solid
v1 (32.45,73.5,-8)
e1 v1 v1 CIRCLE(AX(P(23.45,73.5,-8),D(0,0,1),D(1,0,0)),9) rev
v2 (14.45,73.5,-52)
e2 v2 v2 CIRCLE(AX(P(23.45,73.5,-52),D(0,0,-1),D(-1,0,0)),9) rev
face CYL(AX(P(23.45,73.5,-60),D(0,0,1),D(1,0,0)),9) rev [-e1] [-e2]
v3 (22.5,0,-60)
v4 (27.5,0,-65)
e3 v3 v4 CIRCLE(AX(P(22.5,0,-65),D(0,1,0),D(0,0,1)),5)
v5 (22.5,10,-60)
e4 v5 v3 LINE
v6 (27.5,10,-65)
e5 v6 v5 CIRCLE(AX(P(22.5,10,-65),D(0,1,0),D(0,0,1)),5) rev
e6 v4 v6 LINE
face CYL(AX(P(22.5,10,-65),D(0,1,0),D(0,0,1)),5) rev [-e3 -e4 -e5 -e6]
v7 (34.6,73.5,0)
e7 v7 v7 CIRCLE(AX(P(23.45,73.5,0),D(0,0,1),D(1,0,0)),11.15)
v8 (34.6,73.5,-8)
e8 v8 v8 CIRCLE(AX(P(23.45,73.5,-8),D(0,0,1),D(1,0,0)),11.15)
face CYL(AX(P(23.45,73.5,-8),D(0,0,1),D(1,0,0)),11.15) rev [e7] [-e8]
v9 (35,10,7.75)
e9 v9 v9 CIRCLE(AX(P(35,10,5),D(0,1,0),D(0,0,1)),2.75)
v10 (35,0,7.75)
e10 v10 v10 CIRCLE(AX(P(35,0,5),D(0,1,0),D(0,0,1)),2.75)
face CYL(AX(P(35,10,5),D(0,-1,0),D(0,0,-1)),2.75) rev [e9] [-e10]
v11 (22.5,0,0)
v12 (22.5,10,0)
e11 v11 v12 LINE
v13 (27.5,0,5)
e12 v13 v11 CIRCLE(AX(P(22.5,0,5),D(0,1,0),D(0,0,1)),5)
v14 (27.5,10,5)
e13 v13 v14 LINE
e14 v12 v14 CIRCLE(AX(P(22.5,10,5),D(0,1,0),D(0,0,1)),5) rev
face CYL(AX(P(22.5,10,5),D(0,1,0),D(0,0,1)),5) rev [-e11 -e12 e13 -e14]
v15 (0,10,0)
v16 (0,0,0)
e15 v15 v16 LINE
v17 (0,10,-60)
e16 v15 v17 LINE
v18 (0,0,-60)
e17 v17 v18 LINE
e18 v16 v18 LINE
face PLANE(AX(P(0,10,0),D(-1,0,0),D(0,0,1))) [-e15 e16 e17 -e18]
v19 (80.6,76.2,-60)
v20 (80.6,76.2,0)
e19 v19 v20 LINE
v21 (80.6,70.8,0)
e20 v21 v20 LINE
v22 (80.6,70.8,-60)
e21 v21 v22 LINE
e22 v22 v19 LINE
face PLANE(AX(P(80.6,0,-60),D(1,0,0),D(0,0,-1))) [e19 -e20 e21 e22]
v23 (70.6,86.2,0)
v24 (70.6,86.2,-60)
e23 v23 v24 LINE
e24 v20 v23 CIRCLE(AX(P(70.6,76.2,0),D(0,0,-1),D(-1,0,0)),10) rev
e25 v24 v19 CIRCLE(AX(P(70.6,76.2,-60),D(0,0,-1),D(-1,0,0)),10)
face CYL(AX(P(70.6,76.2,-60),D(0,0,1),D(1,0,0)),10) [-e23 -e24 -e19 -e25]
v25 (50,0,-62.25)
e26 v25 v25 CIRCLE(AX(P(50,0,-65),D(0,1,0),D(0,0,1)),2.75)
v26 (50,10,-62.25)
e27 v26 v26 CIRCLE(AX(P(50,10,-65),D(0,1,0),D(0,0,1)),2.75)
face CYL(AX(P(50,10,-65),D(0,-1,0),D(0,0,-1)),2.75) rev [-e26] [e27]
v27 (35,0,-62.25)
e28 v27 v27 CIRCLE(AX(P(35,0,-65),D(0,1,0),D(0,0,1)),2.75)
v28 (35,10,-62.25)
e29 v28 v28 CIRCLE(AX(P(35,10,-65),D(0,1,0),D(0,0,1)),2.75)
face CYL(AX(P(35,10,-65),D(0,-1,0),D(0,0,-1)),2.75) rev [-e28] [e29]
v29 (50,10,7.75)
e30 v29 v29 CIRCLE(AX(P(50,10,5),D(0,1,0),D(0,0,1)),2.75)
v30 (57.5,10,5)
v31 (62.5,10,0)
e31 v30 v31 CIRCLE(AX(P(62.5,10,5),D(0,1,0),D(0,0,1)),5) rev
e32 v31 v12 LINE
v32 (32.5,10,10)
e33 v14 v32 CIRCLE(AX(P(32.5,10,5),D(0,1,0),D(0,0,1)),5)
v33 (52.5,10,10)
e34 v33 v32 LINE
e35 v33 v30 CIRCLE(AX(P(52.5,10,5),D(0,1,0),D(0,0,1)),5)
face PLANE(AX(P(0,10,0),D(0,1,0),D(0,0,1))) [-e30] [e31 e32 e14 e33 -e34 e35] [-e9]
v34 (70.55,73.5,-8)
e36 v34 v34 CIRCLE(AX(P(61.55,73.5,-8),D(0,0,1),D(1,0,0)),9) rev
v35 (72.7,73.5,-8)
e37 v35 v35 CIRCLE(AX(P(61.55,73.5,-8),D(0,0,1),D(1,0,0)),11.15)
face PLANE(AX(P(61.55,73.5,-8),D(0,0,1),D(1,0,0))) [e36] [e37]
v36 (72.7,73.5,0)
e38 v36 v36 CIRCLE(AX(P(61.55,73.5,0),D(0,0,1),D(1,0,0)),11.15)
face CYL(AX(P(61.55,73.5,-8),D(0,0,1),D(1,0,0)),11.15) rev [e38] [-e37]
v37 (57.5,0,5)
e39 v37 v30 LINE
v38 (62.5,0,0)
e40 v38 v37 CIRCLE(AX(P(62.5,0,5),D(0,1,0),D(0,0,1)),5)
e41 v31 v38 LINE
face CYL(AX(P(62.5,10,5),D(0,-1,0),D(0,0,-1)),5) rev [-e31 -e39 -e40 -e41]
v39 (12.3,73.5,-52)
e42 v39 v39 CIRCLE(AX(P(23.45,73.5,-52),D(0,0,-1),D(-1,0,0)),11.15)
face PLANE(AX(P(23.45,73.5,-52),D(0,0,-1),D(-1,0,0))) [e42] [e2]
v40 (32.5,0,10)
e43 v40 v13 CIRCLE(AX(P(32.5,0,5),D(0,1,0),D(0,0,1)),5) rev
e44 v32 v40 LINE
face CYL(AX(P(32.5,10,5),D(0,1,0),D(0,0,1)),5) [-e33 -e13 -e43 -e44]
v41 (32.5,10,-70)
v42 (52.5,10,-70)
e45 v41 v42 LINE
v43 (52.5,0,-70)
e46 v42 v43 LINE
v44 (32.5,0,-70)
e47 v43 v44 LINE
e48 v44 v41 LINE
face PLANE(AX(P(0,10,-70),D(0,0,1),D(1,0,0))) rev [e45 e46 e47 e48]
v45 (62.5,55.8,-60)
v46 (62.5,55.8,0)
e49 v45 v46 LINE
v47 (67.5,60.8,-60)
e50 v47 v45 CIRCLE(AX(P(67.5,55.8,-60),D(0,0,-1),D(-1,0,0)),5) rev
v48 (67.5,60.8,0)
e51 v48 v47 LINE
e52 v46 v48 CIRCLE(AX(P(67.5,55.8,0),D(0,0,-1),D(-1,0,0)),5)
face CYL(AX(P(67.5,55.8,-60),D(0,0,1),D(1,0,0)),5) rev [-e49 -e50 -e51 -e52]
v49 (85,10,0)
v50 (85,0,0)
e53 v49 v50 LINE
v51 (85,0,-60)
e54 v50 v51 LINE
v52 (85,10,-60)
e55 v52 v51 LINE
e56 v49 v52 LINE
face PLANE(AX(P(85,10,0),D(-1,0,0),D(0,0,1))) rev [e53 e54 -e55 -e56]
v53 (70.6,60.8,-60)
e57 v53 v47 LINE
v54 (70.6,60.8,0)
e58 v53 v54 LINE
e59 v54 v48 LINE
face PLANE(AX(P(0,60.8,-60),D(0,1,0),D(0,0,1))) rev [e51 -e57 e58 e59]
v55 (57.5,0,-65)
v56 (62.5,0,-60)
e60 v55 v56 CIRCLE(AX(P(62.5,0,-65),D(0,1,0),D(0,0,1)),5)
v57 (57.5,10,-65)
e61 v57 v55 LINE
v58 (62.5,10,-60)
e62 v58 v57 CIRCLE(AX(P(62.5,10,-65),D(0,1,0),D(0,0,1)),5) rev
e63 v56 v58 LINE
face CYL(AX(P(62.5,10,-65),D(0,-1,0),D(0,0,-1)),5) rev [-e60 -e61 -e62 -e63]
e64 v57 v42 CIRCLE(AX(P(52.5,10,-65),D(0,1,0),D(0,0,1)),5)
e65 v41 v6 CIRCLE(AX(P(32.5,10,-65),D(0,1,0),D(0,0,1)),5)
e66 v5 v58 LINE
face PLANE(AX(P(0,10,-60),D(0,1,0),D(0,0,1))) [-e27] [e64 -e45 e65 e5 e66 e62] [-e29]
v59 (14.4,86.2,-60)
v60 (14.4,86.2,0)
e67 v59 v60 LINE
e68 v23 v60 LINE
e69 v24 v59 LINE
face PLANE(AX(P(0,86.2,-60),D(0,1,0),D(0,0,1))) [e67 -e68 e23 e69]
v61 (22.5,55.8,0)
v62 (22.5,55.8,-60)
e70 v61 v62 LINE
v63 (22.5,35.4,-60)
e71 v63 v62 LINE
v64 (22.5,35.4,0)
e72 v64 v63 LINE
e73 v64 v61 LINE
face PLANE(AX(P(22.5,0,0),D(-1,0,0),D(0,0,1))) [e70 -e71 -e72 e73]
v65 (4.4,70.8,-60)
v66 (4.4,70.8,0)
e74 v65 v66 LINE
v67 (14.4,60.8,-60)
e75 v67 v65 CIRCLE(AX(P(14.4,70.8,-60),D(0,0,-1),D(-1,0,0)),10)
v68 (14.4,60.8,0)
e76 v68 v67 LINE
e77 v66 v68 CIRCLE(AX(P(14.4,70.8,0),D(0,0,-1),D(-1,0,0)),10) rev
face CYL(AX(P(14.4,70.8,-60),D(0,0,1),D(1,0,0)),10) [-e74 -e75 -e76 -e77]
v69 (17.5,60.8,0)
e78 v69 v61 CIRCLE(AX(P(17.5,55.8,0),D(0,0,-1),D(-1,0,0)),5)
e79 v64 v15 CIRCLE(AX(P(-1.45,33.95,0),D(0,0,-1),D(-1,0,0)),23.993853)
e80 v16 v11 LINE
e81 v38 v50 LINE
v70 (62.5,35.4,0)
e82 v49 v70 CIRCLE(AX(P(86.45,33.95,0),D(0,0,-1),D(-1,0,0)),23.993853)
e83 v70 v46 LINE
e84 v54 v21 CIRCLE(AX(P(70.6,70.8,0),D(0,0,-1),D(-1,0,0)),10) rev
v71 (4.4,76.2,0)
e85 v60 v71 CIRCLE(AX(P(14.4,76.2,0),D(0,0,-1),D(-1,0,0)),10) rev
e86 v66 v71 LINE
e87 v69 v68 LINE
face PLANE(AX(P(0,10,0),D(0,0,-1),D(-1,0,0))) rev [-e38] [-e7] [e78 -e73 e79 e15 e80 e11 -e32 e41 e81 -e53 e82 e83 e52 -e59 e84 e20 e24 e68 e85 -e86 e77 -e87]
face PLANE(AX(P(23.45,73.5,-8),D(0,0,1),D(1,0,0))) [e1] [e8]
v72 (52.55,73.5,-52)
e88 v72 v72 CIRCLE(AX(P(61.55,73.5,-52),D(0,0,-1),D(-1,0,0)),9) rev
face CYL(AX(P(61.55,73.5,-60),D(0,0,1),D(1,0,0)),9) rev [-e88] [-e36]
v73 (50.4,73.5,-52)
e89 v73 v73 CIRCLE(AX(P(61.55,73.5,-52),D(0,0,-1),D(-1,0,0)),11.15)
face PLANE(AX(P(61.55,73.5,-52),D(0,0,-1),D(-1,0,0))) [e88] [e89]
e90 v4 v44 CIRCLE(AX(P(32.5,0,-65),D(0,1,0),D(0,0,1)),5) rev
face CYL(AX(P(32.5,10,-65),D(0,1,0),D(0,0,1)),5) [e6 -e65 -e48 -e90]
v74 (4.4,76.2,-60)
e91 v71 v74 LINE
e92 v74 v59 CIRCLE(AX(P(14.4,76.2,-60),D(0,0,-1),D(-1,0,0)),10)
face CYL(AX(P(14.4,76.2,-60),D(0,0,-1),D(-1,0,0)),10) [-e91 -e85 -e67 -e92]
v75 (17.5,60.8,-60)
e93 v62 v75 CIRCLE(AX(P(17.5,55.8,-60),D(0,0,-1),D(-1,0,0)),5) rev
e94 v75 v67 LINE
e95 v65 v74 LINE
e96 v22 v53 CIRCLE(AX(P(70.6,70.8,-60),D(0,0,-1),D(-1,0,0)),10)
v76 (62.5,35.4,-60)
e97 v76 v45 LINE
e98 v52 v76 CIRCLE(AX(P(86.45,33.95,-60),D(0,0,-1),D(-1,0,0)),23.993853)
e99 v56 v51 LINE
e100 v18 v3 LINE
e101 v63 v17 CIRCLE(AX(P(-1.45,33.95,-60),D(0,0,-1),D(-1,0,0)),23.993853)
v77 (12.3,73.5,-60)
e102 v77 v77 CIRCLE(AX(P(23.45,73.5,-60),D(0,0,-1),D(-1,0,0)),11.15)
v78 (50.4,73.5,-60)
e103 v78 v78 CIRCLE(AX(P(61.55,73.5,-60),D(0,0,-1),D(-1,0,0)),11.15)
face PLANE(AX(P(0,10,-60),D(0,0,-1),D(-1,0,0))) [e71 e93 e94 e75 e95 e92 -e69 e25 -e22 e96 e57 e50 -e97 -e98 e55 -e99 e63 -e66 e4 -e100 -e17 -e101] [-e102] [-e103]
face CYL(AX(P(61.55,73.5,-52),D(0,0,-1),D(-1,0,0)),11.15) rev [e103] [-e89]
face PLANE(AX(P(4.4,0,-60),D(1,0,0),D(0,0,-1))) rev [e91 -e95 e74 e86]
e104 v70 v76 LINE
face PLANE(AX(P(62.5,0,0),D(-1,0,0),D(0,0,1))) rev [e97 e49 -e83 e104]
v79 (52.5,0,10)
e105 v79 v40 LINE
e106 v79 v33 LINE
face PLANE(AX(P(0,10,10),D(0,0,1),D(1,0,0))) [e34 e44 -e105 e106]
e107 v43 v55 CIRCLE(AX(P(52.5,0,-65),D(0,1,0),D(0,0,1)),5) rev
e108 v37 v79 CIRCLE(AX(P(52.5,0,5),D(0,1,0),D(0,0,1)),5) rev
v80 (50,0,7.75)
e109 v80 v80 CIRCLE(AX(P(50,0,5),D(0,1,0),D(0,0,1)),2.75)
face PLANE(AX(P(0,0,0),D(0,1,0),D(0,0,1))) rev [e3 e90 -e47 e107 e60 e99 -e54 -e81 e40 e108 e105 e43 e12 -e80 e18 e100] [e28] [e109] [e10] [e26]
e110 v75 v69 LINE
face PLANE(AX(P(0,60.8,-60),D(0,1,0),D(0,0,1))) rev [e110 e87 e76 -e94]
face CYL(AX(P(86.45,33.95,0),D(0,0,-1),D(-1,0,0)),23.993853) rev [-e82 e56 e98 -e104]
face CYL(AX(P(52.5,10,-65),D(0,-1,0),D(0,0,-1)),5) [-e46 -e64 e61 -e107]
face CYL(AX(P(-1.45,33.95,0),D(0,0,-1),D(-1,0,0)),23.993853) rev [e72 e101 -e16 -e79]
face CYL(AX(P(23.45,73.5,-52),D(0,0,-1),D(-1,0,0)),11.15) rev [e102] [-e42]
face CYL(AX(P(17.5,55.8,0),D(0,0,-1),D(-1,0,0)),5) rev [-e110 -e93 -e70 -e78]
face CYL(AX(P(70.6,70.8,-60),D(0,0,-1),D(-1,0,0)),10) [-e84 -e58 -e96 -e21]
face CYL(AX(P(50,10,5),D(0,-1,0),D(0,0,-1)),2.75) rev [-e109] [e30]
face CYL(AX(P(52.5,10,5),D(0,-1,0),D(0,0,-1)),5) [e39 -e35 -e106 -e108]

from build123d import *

# Parameters (mm, degrees)
SKETCH1_W           = 15
SKETCH1_H           = 10
SKETCH1_R           = 2.75
SKETCH1_W_2         = 85
SKETCH1_H_2         = 60
BOSS_EXTRUDE1_DEPTH = 10
BOSS_EXTRUDE2_DEPTH = 70
CUT_EXTRUDE1_DEPTH  = 10
FILLET1_START       = -1
FILLET1_DEPTH       = 11
FILLET1_2_DEPTH     = 10
SKETCH5_R           = 9
BOSS_EXTRUDE3_DEPTH = 60
SKETCH6_R           = 11.15
CUT_EXTRUDE2_DEPTH  = 8
CUT_EXTRUDE3_START  = -8
SKETCH7_R           = 11.15
CUT_EXTRUDE3_DEPTH  = 8
FILLET2_R           = 10
FILLET3_R           = 5


with BuildPart() as part:
    # Sketch1 → Boss-Extrude1 (new body)
    # profile 1 of 5: a face of its own
    with BuildSketch(Plane(origin=(0, 0, 0), x_dir=(1, 0, 0), z_dir=(0, 1, 0))):
        with Locations((35, 65)):
            Rectangle(SKETCH1_W, SKETCH1_H)
        with Locations(Location((35, 65, 0), (0, 0, 270))):
            Circle(SKETCH1_R, mode=Mode.SUBTRACT)
    # profile 2 of 5: a face of its own
    with BuildSketch(Plane(origin=(0, 0, 0), x_dir=(1, 0, 0), z_dir=(0, 1, 0))):
        with Locations((50, 65)):
            Rectangle(SKETCH1_W, SKETCH1_H)
        with Locations(Location((50, 65, 0), (0, 0, 270))):
            Circle(SKETCH1_R, mode=Mode.SUBTRACT)
    # profile 3 of 5: a face of its own
    with BuildSketch(Plane(origin=(0, 0, 0), x_dir=(1, 0, 0), z_dir=(0, 1, 0))):
        with Locations((50, -5)):
            Rectangle(SKETCH1_W, SKETCH1_H)
        with Locations(Location((50, -5, 0), (0, 0, 270))):
            Circle(SKETCH1_R, mode=Mode.SUBTRACT)
    # profile 4 of 5: a face of its own
    with BuildSketch(Plane(origin=(0, 0, 0), x_dir=(1, 0, 0), z_dir=(0, 1, 0))):
        with Locations((35, -5)):
            Rectangle(SKETCH1_W, SKETCH1_H)
        with Locations(Location((35, -5, 0), (0, 0, 270))):
            Circle(SKETCH1_R, mode=Mode.SUBTRACT)
    # profile 5 of 5: a face of its own
    with BuildSketch(Plane(origin=(0, 0, 0), x_dir=(1, 0, 0), z_dir=(0, 1, 0))):
        with Locations((42.5, 30)):
            Rectangle(SKETCH1_W_2, SKETCH1_H_2)
    extrude(amount=BOSS_EXTRUDE1_DEPTH)

    # Sketch4 → Boss-Extrude2 (add)
    with BuildSketch(Plane(origin=(0, 0, -70), x_dir=(-1, 0, 0), z_dir=(0, 0, -1))):
        with BuildLine():
            Line((-85, 10), (-62.5, 10))
            Line((-62.5, 10), (-62.5, 32.5))
            ThreePointArc((-62.5, 32.5), (-69.483783569, 16.983783569), (-85, 10))
        make_face()
        with BuildLine():
            Line((-57.5, 10), (-42.5, 10))
            Line((-42.5, 10), (-42.5, 60.8))
            Line((-42.5, 60.8), (-62.5, 60.8))
            Line((-62.5, 60.8), (-62.5, 35.4))
            ThreePointArc((-62.5, 35.4), (-62.45614662, 33.95), (-62.5, 32.5))
            Line((-62.5, 32.5), (-62.5, 10))
            Line((-62.5, 10), (-57.5, 10))
        make_face()
        with BuildLine():
            Line((-42.5, 60.8), (-42.5, 10))
            Line((-42.5, 10), (-27.5, 10))
            Line((-27.5, 10), (-22.5, 10))
            Line((-22.5, 10), (-22.5, 32.5))
            ThreePointArc((-22.5, 32.5), (-22.54385338, 33.95), (-22.5, 35.4))
            Line((-22.5, 35.4), (-22.5, 60.8))
            Line((-22.5, 60.8), (-42.5, 60.8))
        make_face()
        with BuildLine():
            Line((-22.5, 32.5), (-22.5, 10))
            Line((-22.5, 10), (0, 10))
            ThreePointArc((0, 10), (-15.516216431, 16.983783569), (-22.5, 32.5))
        make_face()
    extrude(amount=-BOSS_EXTRUDE2_DEPTH)

    # Sketch4<4> → Cut-Extrude1 (cut)
    with BuildSketch(Plane(origin=(0, 0, -70), x_dir=(-1, 0, 0), z_dir=(0, 0, -1))):
        with BuildLine():
            Line((-57.5, 10), (-42.5, 10))
            Line((-42.5, 10), (-42.5, 60.8))
            Line((-42.5, 60.8), (-62.5, 60.8))
            Line((-62.5, 60.8), (-62.5, 35.4))
            ThreePointArc((-62.5, 35.4), (-62.45614662, 33.95), (-62.5, 32.5))
            Line((-62.5, 32.5), (-62.5, 10))
            Line((-62.5, 10), (-57.5, 10))
        make_face()
        with BuildLine():
            Line((-42.5, 60.8), (-42.5, 10))
            Line((-42.5, 10), (-27.5, 10))
            Line((-27.5, 10), (-22.5, 10))
            Line((-22.5, 10), (-22.5, 32.5))
            ThreePointArc((-22.5, 32.5), (-22.54385338, 33.95), (-22.5, 35.4))
            Line((-22.5, 35.4), (-22.5, 60.8))
            Line((-22.5, 60.8), (-42.5, 60.8))
        make_face()
        with BuildLine():
            Line((-85, 10), (-62.5, 10))
            Line((-62.5, 10), (-62.5, 32.5))
            ThreePointArc((-62.5, 32.5), (-69.483783569, 16.983783569), (-85, 10))
        make_face()
        with BuildLine():
            Line((-22.5, 32.5), (-22.5, 10))
            Line((-22.5, 10), (0, 10))
            ThreePointArc((0, 10), (-15.516216431, 16.983783569), (-22.5, 32.5))
        make_face()
    extrude(amount=-CUT_EXTRUDE1_DEPTH, mode=Mode.SUBTRACT)

    # Fillet1: read off the stored shape, not the designer's step
    # Fillet1 outline → Fillet1 (cut)
    with BuildSketch(Plane(origin=(0, 0, 0), x_dir=(1, 0, 0), z_dir=(0, 1, 0)).offset(FILLET1_START)):
        with BuildLine():
            Line((27.5, 70), (27.5, 65))
            ThreePointArc((27.5, 65), (28.964466094, 68.535533906), (32.5, 70))
            Line((32.5, 70), (27.5, 70))
        make_face()
        with BuildLine():
            Line((57.5, 70), (52.5, 70))
            ThreePointArc((52.5, 70), (56.035533906, 68.535533906), (57.5, 65))
            Line((57.5, 65), (57.5, 70))
        make_face()
        with BuildLine():
            Line((57.5, -10), (57.5, -5))
            ThreePointArc((57.5, -5), (56.035533906, -8.535533906), (52.5, -10))
            Line((52.5, -10), (57.5, -10))
        make_face()
        with BuildLine():
            Line((27.5, -10), (32.5, -10))
            ThreePointArc((32.5, -10), (28.964466094, -8.535533906), (27.5, -5))
            Line((27.5, -5), (27.5, -10))
        make_face()
    extrude(amount=FILLET1_DEPTH, mode=Mode.SUBTRACT)

    # Fillet1 2 outline → Fillet1 2 (add)
    with BuildSketch(Plane(origin=(0, 0, 0), x_dir=(1, 0, 0), z_dir=(0, 1, 0))):
        with BuildLine():
            ThreePointArc((27.5, 65), (26.035533906, 61.464466094), (22.5, 60))
            Line((22.5, 60), (27.5, 60))
            Line((27.5, 60), (27.5, 65))
        make_face()
        with BuildLine():
            Line((57.5, 65), (57.5, 60))
            Line((57.5, 60), (62.5, 60))
            ThreePointArc((62.5, 60), (58.964466094, 61.464466094), (57.5, 65))
        make_face()
        with BuildLine():
            Line((57.5, 0), (57.5, -5))
            ThreePointArc((57.5, -5), (58.964466094, -1.464466094), (62.5, 0))
            Line((62.5, 0), (57.5, 0))
        make_face()
        with BuildLine():
            Line((27.5, -5), (27.5, 0))
            Line((27.5, 0), (22.5, 0))
            ThreePointArc((22.5, 0), (26.035533906, -1.464466094), (27.5, -5))
        make_face()
    extrude(amount=FILLET1_2_DEPTH)

    # Sketch5 → Boss-Extrude3 (add)
    # profile 1 of 2: a face of its own
    with BuildSketch(Plane.XY):
        Polygon((22.5, 60.8), (42.5, 60.8), (42.5, 86.2), (4.4, 86.2), (4.4, 60.8), align=None)
        with Locations((23.45, 73.5)):
            Circle(SKETCH5_R, mode=Mode.SUBTRACT)
    # profile 2 of 2: a face of its own
    with BuildSketch(Plane.XY):
        Polygon((42.5, 86.2), (42.5, 60.8), (62.5, 60.8), (80.6, 60.8), (80.6, 86.2), align=None)
        with Locations((61.55, 73.5)):
            Circle(SKETCH5_R, mode=Mode.SUBTRACT)
    extrude(amount=-BOSS_EXTRUDE3_DEPTH)

    # Sketch6 → Cut-Extrude2 (cut)
    with BuildSketch(Plane.XY):
        with Locations((23.45, 73.5)):
            Circle(SKETCH6_R)
        with Locations((61.55, 73.5)):
            Circle(SKETCH6_R)
    extrude(amount=-CUT_EXTRUDE2_DEPTH, mode=Mode.SUBTRACT)

    # Sketch7 → Cut-Extrude3 (cut)
    with BuildSketch(Plane(origin=(0, 0, -60), x_dir=(-1, 0, 0), z_dir=(0, 0, -1)).offset(CUT_EXTRUDE3_START)):
        with Locations(Location((-61.55, 73.5, 0), (0, 0, 180))):
            Circle(SKETCH7_R)
        with Locations(Location((-23.45, 73.5, 0), (0, 0, 180))):
            Circle(SKETCH7_R)
    extrude(amount=CUT_EXTRUDE3_DEPTH, mode=Mode.SUBTRACT)

    # Fillet2
    fillet2_edges = [part.edges().sort_by_distance(p)[0] for p in [
        (80.6, 60.8, -30),
        (4.4, 60.8, -30),
        (4.4, 86.2, -30),
        (80.6, 86.2, -30),
    ]]
    fillet(fillet2_edges, radius=FILLET2_R)

    # Fillet3
    fillet3_edges = [part.edges().sort_by_distance(p)[0] for p in [
        (62.5, 60.8, -30),
        (22.5, 60.8, -30),
    ]]
    fillet(fillet3_edges, radius=FILLET3_R)


solid = part.part
